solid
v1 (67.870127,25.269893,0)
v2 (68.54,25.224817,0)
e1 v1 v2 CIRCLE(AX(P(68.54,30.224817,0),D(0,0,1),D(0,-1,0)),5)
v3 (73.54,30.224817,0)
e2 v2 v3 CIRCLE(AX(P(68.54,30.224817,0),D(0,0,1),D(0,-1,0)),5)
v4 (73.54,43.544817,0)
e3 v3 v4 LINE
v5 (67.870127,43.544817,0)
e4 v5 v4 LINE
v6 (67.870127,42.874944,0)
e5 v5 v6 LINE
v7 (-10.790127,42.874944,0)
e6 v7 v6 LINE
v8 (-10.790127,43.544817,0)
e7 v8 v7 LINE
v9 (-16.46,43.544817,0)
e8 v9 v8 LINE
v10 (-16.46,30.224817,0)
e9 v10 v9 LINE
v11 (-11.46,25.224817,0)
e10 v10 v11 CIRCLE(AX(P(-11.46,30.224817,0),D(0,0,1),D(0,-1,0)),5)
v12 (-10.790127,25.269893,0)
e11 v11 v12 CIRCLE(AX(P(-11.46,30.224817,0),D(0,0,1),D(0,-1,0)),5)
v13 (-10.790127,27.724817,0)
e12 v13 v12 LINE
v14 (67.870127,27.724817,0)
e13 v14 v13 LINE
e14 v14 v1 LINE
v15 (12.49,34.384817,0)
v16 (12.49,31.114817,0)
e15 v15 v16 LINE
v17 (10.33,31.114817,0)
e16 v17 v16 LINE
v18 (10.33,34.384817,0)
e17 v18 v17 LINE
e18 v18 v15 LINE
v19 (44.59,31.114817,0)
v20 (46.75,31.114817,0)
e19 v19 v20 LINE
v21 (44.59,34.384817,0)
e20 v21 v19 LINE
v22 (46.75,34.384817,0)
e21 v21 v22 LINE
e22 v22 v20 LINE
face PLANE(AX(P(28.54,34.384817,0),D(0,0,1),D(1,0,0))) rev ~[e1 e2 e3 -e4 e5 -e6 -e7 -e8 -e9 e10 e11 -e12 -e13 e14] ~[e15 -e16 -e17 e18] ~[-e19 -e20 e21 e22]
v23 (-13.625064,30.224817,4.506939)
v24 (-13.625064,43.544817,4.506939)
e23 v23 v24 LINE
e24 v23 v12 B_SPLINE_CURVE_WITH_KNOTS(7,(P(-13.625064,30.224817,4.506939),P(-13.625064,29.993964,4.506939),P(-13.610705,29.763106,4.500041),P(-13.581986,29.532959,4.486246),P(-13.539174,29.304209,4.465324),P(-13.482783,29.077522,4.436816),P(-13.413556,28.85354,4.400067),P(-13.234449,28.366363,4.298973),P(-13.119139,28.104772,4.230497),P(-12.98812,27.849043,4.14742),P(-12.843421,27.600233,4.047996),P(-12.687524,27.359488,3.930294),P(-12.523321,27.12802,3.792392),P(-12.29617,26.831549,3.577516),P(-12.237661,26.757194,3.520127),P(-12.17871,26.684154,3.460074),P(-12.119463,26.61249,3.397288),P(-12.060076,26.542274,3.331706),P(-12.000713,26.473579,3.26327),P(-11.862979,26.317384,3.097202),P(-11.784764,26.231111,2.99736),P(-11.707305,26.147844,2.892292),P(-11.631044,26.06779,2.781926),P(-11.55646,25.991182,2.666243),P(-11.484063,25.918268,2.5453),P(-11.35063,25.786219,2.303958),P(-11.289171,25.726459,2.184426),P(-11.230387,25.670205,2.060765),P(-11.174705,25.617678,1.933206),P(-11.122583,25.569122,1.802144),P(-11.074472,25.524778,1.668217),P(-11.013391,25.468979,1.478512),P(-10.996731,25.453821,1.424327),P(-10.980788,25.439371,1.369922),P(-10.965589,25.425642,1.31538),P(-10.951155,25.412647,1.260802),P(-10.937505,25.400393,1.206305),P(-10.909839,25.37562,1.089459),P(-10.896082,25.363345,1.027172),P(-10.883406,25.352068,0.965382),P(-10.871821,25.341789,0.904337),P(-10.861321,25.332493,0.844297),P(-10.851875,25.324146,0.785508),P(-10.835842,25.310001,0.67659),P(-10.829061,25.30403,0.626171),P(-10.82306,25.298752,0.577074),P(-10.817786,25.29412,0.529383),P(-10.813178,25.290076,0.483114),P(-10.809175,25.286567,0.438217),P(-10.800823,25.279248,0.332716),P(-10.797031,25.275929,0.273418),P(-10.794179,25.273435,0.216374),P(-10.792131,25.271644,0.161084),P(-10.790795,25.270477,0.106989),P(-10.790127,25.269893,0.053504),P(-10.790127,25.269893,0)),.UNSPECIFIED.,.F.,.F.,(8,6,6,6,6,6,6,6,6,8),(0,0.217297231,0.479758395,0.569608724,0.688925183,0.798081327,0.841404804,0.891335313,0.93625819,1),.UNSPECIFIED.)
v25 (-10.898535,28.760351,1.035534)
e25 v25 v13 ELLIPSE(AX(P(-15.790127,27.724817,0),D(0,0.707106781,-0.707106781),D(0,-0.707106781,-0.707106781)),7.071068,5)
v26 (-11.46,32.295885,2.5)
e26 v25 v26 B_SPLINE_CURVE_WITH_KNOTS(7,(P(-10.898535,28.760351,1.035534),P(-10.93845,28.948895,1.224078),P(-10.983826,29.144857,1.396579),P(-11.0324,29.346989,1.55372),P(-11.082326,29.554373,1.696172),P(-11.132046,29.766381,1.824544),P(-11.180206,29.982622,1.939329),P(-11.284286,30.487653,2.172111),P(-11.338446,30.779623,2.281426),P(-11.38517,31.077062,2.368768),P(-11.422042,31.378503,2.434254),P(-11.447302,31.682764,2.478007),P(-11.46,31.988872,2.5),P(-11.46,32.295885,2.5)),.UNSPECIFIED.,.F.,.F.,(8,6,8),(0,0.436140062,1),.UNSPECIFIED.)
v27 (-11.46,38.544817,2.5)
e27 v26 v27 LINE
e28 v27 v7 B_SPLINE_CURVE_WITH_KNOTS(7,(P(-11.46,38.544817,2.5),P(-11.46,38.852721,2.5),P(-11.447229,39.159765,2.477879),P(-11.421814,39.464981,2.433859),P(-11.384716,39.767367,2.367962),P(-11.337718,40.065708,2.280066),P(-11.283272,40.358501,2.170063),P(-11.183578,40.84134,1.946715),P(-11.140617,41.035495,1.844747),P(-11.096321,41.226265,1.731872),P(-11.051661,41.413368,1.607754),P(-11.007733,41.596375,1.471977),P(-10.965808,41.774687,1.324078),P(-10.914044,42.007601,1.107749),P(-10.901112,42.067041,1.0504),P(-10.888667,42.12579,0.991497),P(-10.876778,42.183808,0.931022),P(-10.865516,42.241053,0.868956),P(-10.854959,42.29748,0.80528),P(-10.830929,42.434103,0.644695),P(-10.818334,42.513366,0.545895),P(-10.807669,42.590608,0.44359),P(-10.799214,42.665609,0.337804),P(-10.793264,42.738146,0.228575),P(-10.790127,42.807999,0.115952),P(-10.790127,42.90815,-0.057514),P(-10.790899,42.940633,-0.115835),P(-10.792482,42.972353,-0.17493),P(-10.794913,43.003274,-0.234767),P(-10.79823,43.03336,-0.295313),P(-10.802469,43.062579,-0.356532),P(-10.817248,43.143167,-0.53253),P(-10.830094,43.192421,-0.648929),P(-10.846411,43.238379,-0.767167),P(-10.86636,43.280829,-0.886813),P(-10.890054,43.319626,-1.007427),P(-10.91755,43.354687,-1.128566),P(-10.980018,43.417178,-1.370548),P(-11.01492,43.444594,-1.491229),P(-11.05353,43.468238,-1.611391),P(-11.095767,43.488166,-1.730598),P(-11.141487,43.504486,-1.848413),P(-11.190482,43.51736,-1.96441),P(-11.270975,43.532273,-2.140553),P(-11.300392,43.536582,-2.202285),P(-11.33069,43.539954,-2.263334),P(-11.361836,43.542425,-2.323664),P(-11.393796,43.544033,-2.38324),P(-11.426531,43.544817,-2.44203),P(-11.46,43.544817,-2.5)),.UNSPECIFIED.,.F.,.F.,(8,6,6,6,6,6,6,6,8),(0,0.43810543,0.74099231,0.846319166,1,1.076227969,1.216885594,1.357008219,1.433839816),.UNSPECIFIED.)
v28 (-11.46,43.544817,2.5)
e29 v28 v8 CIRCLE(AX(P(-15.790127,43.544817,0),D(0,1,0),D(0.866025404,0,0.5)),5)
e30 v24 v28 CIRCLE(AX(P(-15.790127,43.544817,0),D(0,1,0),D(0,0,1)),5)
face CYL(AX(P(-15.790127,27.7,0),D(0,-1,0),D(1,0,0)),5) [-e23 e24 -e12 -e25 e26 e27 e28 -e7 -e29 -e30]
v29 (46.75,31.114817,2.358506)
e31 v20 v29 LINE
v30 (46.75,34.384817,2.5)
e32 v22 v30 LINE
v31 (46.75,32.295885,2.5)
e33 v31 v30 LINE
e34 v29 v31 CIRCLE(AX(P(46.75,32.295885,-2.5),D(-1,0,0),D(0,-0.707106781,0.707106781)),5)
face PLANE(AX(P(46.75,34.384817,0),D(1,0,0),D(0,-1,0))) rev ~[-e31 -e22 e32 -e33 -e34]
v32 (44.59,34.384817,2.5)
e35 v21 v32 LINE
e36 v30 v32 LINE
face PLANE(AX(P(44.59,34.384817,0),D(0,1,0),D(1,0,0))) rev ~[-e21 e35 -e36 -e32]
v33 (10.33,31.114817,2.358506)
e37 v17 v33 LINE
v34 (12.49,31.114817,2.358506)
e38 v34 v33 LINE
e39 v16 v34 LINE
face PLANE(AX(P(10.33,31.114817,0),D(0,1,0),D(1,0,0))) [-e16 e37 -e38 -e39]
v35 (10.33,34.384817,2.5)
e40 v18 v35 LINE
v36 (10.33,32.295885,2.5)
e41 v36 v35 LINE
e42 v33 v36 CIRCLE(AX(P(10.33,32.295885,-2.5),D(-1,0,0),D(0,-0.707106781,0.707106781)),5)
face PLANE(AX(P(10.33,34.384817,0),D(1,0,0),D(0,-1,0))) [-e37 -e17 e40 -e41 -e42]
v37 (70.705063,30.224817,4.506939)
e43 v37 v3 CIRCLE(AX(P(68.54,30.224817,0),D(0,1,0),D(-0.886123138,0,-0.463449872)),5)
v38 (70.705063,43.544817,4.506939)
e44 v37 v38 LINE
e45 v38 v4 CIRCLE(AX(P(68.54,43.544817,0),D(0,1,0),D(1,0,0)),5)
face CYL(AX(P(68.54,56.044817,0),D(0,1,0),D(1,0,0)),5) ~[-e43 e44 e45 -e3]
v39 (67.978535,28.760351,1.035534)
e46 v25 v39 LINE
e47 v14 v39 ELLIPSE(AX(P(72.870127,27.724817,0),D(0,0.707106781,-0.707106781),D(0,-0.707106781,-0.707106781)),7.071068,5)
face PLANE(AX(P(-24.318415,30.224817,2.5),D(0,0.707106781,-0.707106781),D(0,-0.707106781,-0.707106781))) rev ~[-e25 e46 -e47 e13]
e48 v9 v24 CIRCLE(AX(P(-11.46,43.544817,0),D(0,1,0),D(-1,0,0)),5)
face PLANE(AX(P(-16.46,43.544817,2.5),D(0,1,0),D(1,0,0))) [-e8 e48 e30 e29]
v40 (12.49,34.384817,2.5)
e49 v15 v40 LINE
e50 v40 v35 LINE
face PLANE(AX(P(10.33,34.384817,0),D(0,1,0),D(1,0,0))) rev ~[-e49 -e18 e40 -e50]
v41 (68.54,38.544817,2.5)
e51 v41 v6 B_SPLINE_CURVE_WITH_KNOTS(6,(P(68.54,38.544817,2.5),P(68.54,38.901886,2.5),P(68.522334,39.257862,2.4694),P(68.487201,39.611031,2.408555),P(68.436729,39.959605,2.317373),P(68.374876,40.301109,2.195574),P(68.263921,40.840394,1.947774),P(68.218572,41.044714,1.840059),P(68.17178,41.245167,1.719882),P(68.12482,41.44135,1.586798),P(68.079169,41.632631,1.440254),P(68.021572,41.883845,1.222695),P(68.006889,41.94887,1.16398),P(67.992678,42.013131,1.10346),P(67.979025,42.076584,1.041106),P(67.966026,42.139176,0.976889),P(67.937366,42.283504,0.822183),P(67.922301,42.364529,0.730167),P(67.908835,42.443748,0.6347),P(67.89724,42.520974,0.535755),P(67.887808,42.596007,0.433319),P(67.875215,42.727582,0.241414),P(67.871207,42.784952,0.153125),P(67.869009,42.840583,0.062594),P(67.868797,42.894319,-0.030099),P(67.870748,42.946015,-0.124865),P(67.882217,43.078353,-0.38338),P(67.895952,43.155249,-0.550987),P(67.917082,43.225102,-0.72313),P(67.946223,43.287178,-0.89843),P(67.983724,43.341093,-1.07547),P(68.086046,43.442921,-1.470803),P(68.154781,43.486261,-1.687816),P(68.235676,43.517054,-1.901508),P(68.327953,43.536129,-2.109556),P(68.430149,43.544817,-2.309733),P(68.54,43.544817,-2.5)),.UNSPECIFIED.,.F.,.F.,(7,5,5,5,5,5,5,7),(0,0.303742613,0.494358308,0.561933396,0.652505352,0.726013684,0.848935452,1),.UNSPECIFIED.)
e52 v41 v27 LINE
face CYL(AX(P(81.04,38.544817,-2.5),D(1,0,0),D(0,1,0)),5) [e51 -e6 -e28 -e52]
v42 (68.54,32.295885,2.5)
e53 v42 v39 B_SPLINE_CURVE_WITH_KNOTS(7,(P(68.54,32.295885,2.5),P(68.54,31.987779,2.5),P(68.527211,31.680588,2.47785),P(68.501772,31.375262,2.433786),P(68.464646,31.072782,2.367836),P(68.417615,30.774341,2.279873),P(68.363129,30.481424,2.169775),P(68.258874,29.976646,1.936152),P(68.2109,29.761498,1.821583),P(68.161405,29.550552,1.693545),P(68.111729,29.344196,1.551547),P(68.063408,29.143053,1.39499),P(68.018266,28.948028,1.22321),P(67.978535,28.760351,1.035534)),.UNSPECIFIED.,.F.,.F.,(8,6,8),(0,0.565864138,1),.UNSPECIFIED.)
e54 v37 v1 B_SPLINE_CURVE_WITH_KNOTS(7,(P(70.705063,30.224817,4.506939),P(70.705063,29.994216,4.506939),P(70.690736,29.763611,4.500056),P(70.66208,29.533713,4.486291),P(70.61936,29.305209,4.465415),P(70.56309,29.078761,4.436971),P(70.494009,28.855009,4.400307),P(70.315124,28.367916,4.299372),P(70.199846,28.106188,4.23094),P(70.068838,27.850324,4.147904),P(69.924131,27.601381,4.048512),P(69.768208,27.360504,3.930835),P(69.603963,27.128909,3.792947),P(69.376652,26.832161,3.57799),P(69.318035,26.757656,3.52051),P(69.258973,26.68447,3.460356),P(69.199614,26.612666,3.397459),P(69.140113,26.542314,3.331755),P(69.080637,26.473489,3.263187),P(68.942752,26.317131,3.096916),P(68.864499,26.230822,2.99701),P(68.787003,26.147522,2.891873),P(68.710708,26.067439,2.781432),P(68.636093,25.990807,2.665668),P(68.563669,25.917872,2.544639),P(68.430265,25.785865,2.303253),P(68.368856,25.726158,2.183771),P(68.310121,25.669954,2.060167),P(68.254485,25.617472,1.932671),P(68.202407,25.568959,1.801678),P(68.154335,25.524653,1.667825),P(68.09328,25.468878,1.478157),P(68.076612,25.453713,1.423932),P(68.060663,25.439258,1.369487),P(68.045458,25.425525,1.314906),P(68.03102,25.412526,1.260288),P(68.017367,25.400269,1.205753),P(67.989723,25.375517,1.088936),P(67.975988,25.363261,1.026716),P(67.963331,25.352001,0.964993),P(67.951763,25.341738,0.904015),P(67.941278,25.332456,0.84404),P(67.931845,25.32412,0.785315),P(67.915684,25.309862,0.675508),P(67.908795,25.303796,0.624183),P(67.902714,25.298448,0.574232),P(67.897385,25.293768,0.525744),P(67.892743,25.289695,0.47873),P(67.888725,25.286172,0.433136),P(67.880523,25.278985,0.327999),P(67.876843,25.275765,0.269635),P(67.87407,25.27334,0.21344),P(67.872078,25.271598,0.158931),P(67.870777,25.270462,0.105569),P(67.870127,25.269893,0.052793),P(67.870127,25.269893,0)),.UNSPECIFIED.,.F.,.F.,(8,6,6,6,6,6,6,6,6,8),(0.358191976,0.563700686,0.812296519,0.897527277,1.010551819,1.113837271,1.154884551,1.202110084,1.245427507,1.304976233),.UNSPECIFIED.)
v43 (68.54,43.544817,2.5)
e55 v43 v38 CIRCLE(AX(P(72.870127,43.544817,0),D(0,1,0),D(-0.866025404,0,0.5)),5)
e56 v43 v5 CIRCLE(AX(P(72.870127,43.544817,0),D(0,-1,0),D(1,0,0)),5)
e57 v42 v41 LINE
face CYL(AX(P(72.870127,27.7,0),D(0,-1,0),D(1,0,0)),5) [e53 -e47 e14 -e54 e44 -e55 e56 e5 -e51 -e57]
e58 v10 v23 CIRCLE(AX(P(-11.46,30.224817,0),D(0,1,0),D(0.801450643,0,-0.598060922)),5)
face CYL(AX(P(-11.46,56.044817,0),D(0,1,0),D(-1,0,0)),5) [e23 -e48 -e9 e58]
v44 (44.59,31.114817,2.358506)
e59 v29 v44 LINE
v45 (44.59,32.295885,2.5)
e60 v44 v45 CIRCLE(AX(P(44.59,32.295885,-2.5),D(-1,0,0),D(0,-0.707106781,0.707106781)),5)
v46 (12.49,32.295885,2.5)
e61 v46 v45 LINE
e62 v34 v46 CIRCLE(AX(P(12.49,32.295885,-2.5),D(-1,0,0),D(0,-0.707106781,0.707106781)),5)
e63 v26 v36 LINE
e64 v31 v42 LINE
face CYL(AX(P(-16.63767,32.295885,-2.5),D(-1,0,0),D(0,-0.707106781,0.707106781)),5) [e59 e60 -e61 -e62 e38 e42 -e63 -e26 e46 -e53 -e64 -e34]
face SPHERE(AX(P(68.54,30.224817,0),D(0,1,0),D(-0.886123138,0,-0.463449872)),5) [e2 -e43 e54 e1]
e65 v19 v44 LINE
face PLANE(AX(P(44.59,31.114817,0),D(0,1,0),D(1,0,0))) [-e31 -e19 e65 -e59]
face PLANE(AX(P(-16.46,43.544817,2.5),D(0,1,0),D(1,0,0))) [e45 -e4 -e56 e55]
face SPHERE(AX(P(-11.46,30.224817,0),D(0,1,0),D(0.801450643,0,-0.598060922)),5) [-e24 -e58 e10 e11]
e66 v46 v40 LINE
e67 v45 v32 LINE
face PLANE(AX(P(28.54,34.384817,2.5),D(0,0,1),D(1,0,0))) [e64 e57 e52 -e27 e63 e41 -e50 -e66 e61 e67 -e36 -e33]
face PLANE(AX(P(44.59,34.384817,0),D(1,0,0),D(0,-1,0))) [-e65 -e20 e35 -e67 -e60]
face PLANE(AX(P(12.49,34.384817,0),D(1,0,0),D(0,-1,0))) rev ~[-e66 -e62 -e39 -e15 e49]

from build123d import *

# Parameters (mm, degrees)
F0_W          = 90
F0_H          = 18.32
F1_DEPTH      = 2.5
F2_W          = 2.16
F2_H          = 3.27
F3_DEPTH      = 25
F4_W          = 5
F4_H          = 18.32
F5_DEPTH      = 2.5
F6_T1_DEPTH   = 43.32
F6_T3_DEPTH   = 39.9706350946
F7_T1_DEPTH   = 39.9706350946
F7_T3_DEPTH   = 43.32
F8_T4_DEPTH   = 105.7168298797
F8_S5_R       = 5.0000000001
F8_T6_DEPTH   = 54
F8_S7_R       = 5.0000000001
F8_T8_DEPTH   = 54
F9_T4_DEPTH   = 105
F9_S5_R       = 5.0000000001
F9_T6_DEPTH   = 54
F9_S7_R       = 5.0000000001
F9_T8_DEPTH   = 54
F10_T4_ANGLE  = 350.8787991533
F10_S5_R      = 5.0000000001
F10_T6_DEPTH  = 9
F10_T10_ANGLE = 350.8787991654
F10_S11_R     = 5.0000000001
F10_T12_DEPTH = 9
F11_T4_DEPTH  = 90.3553390593
F11_S5_R      = 5.0000000001
F11_T6_DEPTH  = 47
F11_S7_R      = 5.0000000001
F11_T8_DEPTH  = 47


# Not quite as in the source:
# - a fillet or chamfer that OpenCascade refuses, or shapes differently, is made with other operations: its cross-section is extruded or revolved along the edge and cut away or added


with BuildPart() as f1:
    # F0 (on Top) → F1 (new body)
    with BuildSketch(Plane.XY):
        with Locations((28.5399998152, 34.3848172414)):
            Rectangle(F0_W, F0_H)
    extrude(amount=F1_DEPTH)

    # F2 (on face) → F3 (cut)
    with BuildSketch(Plane(origin=(0, 0, 0), x_dir=(1, 0, 0), z_dir=(0, 0, -1))):
        with Locations((11.4099998152, -32.7498172414)):
            Rectangle(F2_W, F2_H)
        with Locations((45.6699998152, -32.7498172414)):
            Rectangle(F2_W, F2_H)
    extrude(amount=-F3_DEPTH, mode=Mode.SUBTRACT)

    # F4 (on face) → F5 (join)
    with BuildSketch(Plane.XY.offset(2.5)):
        with Locations((-13.9600001848, 34.3848172414)):
            Rectangle(F4_W, F4_H)
        with Locations((71.0399998152, 34.3848172414)):
            Rectangle(F4_W, F4_H)
    extrude(amount=F5_DEPTH)

    # F6: fillet of radius 5 on 2 edges, made by hand

    # F6_s2 → F6_t1 (cut)
    with BuildSketch(Plane.XZ.offset(-56.0448172414)):
        with BuildLine():
            ThreePointArc((-16.4600001848, 0), (-14.9955340907, 3.5355339059), (-11.4600001848, 5))
            Line((-11.4600001848, 5), (-16.4600001848, 5))
            Line((-16.4600001848, 5), (-16.4600001848, 0))
        make_face()
    extrude(amount=F6_T1_DEPTH, mode=Mode.SUBTRACT)

    # F6_s4 → F6_t3 (cut)
    with BuildSketch(Plane.XZ.offset(-54.3701347887)):
        with BuildLine():
            ThreePointArc((-15.7901272037, 5), (-13.2901272037, 4.3301270189), (-11.4600001848, 2.5))
            Line((-11.4600001848, 2.5), (-11.4600001848, 5))
            Line((-11.4600001848, 5), (-15.7901272037, 5))
        make_face()
    extrude(amount=F6_T3_DEPTH, mode=Mode.SUBTRACT)

    # F7: fillet of radius 5 on 2 edges, made by hand

    # F7_s2 → F7_t1 (cut)
    with BuildSketch(Plane.XZ.offset(-54.3701347887)):
        with BuildLine():
            ThreePointArc((68.5399998152, 2.5), (70.3701268341, 4.3301270189), (72.8701268341, 5))
            Line((72.8701268341, 5), (68.5399998152, 5))
            Line((68.5399998152, 5), (68.5399998152, 2.5))
        make_face()
    extrude(amount=F7_T1_DEPTH, mode=Mode.SUBTRACT)

    # F7_s4 → F7_t3 (cut)
    with BuildSketch(Plane.XZ.offset(-56.0448172414)):
        with BuildLine():
            ThreePointArc((73.5399998152, 0), (72.0755337212, 3.5355339059), (68.5399998152, 5))
            Line((68.5399998152, 5), (73.5399998152, 5))
            Line((73.5399998152, 5), (73.5399998152, 0))
        make_face()
    extrude(amount=F7_T3_DEPTH, mode=Mode.SUBTRACT)

    # F8: chamfer of 5 on 1 edges, made by hand


with BuildPart() as f8_tool2:
    # F8_s3 → F8_t4 (new body)
    with BuildSketch(Plane.YZ.offset(-24.3184151246)):
        Polygon((30.2248172414, 2.5), (25.2248172414, -2.5), (25.2248172414, 2.5), align=None)
    extrude(amount=F8_T4_DEPTH)

    # F8_s5 → F8_t6 (cut, symmetric)
    with BuildSketch(Plane.XZ.offset(-27.7)):
        with Locations((-15.7901272038, -1e-10)):
            Circle(F8_S5_R)
    extrude(amount=F8_T6_DEPTH, both=True, mode=Mode.SUBTRACT)

    # F8_s7 → F8_t8 (cut, symmetric)
    with BuildSketch(Plane.XZ.offset(-27.7)):
        with Locations((72.8701268342, -1e-10)):
            Circle(F8_S7_R)
    extrude(amount=F8_T8_DEPTH, both=True, mode=Mode.SUBTRACT)


with BuildPart() as f1_1:
    add(f1.part)

    # F8_t1: cut F8_tool2
    add(f8_tool2.part, mode=Mode.SUBTRACT)

    # F9: fillet of radius 5 on 1 edges, made by hand


with BuildPart() as f9_tool2:
    # F9_s3 → F9_t4 (new body)
    with BuildSketch(Plane.YZ.offset(81.0399998152)):
        with BuildLine():
            ThreePointArc((43.5448172414, -2.5), (42.0803511473, 1.0355339059), (38.5448172414, 2.5))
            Line((38.5448172414, 2.5), (43.5448172414, 2.5))
            Line((43.5448172414, 2.5), (43.5448172414, -2.5))
        make_face()
    extrude(amount=-F9_T4_DEPTH)

    # F9_s5 → F9_t6 (cut, symmetric)
    with BuildSketch(Plane.XZ.offset(-41)):
        with Locations((72.8701268342, -1e-10)):
            Circle(F9_S5_R)
    extrude(amount=F9_T6_DEPTH, both=True, mode=Mode.SUBTRACT)

    # F9_s7 → F9_t8 (cut, symmetric)
    with BuildSketch(Plane.XZ.offset(-41)):
        with Locations((-15.7901272038, -1e-10)):
            Circle(F9_S7_R)
    extrude(amount=F9_T8_DEPTH, both=True, mode=Mode.SUBTRACT)


with BuildPart() as f1_2:
    add(f1_1.part)

    # F9_t1: cut F9_tool2
    add(f9_tool2.part, mode=Mode.SUBTRACT)

    # F10: fillet of radius 5 on 2 edges, made by hand


with BuildPart() as f10_tool2:
    # F10_s3 → F10_t4 (revolve)
    with BuildSketch(Plane(origin=(-4.0989769567, 0, -5.492965009), x_dir=(0, 1, 0), z_dir=(0.5980609221, 0, 0.8014506432))):
        with BuildLine():
            ThreePointArc((25.2248172414, 9.1846245187), (26.6892833355, 5.6490906128), (30.2248172414, 4.1846245187))
            Line((30.2248172414, 4.1846245187), (25.2248172414, 4.1846245187))
            Line((25.2248172414, 4.1846245187), (25.2248172414, 9.1846245187))
        make_face()
    revolve(axis=Axis((-11.4600001847, 25.2248172414, -1e-10), (0, 1, 0)), revolution_arc=F10_T4_ANGLE)

    # F10_s5 → F10_t6 (intersect, symmetric)
    with BuildSketch(Plane.XZ.offset(-27.7)):
        with Locations((-15.7901272038, -1e-10)):
            Circle(F10_S5_R)
    extrude(amount=F10_T6_DEPTH, both=True, mode=Mode.INTERSECT)


with BuildPart() as f1_3:
    add(f1_2.part)

    # F10_t1: cut F10_tool2
    add(f10_tool2.part, mode=Mode.SUBTRACT)


with BuildPart() as f10_tool8:
    # F10_s9 → F10_t10 (revolve)
    with BuildSketch(Plane(origin=(14.7214175546, 0, -28.147572216), x_dir=(0, 1, 0), z_dir=(0.4634498715, 0, -0.8861231385))):
        with BuildLine():
            ThreePointArc((25.2248172414, 60.7348797497), (26.6892833355, 57.1993458438), (30.2248172414, 55.7348797497))
            Line((30.2248172414, 55.7348797497), (25.2248172414, 55.7348797497))
            Line((25.2248172414, 55.7348797497), (25.2248172414, 60.7348797497))
        make_face()
    revolve(axis=Axis((68.5399998153, 25.2248172414, 1e-10), (0, 1, 0)), revolution_arc=F10_T10_ANGLE)

    # F10_s11 → F10_t12 (intersect, symmetric)
    with BuildSketch(Plane.XZ.offset(-27.7)):
        with Locations((72.8701268342, -1e-10)):
            Circle(F10_S11_R)
    extrude(amount=F10_T12_DEPTH, both=True, mode=Mode.INTERSECT)


with BuildPart() as f1_4:
    add(f1_3.part)

    # F10_t7: cut F10_tool8
    add(f10_tool8.part, mode=Mode.SUBTRACT)

    # F11: fillet of radius 5 on 1 edges, made by hand


with BuildPart() as f11_tool2:
    # F11_s3 → F11_t4 (new body)
    with BuildSketch(Plane.YZ.offset(-16.6376697145)):
        with BuildLine():
            ThreePointArc((28.7603511473, 1.0355339059), (30.3824678914, 2.1193976626), (32.2958850533, 2.5))
            Line((32.2958850533, 2.5), (30.2248172414, 2.5))
            Line((30.2248172414, 2.5), (28.7603511473, 1.0355339059))
        make_face()
    extrude(amount=F11_T4_DEPTH)

    # F11_s5 → F11_t6 (cut, symmetric)
    with BuildSketch(Plane.XZ.offset(-30.5)):
        with Locations((72.8701268342, -1e-10)):
            Circle(F11_S5_R)
    extrude(amount=F11_T6_DEPTH, both=True, mode=Mode.SUBTRACT)

    # F11_s7 → F11_t8 (cut, symmetric)
    with BuildSketch(Plane.XZ.offset(-30.5)):
        with Locations((-15.7901272038, -1e-10)):
            Circle(F11_S7_R)
    extrude(amount=F11_T8_DEPTH, both=True, mode=Mode.SUBTRACT)


with BuildPart() as f1_5:
    add(f1_4.part)

    # F11_t1: cut F11_tool2
    add(f11_tool2.part, mode=Mode.SUBTRACT)


solid = f1_5.part
